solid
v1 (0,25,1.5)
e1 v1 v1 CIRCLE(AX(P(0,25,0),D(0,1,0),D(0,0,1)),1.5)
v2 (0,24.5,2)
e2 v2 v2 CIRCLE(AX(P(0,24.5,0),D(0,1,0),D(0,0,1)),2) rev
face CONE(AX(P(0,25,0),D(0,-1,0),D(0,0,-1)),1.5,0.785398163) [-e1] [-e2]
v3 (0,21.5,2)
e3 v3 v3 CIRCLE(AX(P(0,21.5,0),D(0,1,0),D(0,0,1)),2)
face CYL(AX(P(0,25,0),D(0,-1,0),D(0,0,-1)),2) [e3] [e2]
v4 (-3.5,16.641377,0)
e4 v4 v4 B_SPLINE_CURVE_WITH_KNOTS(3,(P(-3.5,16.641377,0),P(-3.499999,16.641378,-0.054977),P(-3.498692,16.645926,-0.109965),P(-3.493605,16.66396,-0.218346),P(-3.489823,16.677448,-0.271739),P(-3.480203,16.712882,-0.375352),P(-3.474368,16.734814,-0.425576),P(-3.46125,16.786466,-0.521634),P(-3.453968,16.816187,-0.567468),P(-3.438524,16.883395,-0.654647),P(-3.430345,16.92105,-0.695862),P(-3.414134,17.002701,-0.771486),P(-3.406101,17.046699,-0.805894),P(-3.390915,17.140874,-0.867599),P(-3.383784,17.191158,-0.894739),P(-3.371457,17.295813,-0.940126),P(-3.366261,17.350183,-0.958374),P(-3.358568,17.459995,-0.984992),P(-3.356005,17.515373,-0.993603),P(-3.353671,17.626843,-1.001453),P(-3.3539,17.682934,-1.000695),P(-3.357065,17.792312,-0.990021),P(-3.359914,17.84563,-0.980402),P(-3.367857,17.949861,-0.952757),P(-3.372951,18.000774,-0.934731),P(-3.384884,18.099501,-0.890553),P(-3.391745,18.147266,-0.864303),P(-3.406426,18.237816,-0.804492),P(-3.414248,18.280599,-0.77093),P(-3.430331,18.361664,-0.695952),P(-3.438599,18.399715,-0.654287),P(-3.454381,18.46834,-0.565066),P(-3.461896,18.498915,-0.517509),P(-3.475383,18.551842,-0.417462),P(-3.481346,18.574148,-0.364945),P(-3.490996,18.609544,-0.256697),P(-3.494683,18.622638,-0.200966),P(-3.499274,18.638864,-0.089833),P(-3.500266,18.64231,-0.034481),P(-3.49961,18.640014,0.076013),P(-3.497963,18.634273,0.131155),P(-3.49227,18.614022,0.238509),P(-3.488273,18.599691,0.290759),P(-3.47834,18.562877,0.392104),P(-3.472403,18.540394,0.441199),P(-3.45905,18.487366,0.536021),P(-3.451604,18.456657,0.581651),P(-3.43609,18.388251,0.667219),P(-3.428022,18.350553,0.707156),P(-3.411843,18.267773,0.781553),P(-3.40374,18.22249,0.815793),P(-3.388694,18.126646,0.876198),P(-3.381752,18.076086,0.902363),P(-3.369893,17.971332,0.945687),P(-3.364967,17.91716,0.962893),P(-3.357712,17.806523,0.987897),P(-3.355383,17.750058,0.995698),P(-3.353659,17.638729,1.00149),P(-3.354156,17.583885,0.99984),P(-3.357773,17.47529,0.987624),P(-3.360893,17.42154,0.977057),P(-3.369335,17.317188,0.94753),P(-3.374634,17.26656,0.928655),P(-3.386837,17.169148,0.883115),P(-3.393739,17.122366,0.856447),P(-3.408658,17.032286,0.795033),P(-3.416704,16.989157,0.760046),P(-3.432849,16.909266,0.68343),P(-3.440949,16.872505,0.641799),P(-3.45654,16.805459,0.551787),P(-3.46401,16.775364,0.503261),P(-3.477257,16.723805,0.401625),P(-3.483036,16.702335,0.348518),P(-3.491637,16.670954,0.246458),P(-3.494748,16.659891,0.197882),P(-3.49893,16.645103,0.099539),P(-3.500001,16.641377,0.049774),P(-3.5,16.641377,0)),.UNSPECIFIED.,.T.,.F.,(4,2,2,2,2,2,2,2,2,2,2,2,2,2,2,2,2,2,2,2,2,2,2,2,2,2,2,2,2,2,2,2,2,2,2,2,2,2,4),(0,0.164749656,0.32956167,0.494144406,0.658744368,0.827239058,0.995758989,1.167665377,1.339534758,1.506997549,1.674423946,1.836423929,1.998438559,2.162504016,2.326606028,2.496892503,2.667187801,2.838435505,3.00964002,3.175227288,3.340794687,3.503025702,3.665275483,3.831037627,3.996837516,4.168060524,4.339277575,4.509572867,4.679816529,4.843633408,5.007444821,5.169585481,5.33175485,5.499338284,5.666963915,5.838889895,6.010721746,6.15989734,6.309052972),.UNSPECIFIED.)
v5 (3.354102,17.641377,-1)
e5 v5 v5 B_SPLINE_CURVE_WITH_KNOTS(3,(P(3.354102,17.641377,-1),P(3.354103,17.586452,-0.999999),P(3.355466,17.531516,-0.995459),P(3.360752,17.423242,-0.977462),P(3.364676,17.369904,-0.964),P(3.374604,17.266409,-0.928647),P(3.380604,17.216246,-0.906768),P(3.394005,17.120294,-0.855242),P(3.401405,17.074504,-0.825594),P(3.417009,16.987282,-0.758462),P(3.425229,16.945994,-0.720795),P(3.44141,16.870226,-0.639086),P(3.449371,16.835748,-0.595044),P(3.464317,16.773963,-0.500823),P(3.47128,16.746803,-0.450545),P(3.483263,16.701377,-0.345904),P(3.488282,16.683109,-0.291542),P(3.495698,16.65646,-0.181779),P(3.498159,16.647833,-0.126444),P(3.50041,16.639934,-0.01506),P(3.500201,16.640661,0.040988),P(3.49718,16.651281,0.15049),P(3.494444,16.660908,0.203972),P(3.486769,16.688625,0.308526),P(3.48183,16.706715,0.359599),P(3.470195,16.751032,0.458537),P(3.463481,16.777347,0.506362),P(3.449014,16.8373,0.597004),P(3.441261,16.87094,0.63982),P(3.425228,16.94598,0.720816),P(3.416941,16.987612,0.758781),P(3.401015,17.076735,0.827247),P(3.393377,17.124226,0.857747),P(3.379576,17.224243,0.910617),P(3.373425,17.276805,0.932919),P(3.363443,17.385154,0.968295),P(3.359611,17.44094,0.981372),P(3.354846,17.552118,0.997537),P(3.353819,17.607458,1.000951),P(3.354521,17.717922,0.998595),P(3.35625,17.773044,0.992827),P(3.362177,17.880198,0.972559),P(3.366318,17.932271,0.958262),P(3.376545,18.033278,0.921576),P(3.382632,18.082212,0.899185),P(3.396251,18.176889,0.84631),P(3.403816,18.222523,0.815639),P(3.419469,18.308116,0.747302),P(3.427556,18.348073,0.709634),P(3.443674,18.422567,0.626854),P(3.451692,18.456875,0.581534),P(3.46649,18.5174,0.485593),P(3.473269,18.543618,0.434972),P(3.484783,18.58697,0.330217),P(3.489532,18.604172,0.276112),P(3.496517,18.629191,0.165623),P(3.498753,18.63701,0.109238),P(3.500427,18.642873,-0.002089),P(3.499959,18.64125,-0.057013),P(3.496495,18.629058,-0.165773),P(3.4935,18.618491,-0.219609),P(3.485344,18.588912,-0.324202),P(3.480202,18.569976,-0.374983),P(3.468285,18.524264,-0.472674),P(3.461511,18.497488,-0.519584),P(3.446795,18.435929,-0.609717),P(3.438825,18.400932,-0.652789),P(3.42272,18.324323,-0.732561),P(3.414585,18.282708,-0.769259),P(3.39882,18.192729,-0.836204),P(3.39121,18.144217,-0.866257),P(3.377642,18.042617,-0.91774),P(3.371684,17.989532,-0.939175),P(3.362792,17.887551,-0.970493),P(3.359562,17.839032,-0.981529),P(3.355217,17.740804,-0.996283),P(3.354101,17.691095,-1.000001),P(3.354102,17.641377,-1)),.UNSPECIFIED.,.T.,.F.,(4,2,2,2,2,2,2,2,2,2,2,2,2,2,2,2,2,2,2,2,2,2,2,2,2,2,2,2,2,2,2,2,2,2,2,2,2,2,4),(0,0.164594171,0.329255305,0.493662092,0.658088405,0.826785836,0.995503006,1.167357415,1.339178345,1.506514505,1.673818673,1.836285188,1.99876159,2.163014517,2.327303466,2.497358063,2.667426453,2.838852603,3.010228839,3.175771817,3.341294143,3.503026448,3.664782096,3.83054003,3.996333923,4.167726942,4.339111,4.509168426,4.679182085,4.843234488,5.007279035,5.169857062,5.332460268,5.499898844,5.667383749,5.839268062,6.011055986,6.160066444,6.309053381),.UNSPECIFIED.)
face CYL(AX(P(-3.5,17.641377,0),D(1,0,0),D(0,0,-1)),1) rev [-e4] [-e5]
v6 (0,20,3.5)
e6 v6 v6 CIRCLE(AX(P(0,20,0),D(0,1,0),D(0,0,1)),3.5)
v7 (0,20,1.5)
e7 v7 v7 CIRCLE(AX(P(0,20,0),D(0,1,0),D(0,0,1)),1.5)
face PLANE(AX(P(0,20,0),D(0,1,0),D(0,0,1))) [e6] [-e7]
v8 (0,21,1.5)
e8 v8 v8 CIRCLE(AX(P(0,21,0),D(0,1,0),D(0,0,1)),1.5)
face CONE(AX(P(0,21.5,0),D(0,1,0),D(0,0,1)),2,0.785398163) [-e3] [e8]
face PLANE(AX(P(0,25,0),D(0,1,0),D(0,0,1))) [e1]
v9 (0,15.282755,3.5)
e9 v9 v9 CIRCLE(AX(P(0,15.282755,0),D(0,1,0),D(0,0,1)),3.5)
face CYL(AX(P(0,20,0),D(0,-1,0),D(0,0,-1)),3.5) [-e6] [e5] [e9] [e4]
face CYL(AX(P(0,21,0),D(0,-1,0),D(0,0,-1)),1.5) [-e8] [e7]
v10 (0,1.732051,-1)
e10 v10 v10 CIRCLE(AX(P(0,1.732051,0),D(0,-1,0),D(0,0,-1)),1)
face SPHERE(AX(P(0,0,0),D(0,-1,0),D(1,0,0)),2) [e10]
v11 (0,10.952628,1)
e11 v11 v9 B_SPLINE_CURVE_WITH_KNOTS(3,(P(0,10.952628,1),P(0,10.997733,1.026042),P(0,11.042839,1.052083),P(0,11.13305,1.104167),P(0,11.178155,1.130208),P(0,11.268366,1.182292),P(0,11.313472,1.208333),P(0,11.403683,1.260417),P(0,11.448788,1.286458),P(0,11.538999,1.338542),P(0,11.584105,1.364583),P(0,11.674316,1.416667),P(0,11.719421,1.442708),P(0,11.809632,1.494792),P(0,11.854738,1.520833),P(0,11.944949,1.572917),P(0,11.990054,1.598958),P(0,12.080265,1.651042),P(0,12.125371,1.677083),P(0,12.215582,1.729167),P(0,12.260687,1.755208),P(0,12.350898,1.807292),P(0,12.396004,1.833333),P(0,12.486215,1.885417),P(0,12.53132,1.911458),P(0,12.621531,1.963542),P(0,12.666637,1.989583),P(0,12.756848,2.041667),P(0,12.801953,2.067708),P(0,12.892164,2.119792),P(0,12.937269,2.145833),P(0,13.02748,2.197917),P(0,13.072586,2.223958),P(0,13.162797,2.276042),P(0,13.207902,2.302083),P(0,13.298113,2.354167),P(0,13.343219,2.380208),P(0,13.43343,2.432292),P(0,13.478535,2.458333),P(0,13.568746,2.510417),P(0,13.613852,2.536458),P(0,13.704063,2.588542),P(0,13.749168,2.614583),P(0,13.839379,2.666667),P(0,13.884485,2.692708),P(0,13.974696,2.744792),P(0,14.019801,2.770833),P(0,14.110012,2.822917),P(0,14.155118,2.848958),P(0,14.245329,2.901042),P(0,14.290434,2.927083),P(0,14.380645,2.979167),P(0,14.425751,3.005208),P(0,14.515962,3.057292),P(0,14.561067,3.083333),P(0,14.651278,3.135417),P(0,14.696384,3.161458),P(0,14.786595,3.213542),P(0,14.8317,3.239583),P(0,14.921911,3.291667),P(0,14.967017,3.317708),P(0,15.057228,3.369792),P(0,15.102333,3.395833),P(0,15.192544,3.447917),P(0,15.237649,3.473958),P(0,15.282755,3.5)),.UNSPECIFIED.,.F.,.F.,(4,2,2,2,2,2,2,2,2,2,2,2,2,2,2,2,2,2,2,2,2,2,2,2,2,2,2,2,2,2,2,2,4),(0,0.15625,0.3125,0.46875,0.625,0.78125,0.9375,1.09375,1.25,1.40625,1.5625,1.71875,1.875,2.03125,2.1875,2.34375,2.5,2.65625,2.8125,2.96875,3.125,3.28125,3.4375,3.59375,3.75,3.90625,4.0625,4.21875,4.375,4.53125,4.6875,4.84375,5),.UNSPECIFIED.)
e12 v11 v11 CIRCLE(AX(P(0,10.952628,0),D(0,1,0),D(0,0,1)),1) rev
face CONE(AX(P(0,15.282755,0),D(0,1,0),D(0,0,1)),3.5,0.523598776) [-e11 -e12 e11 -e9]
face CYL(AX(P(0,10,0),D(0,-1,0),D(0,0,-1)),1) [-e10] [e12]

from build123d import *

# Parameters (mm, degrees)
SKETCH2_R               = 1
BOSS_EXTRUDE2_DEPTH     = 10
SKETCH4_R               = 3.5
BOSS_EXTRUDE3_DEPTH     = 10
CHAMFER1_SIZE           = 5.282754963
CHAMFER1_SIZE_2         = 3.05
CUT_EXTRUDE4_DEPTH      = 21.603397778
CUT_EXTRUDE4_DEPTH_BACK = 21.603397778
SKETCH5_R               = 1
SKETCH6_R               = 1.5
BOSS_EXTRUDE4_DEPTH     = 1
SKETCH7_R               = 2
BOSS_EXTRUDE5_DEPTH     = 4
CHAMFER2_SIZE           = 0.5


# Some blends are built 0.0001 mm under size
with BuildPart() as part:
    # Sketch1 → Revolve1 (revolve)
    with BuildSketch(Plane.XY):
        with BuildLine():
            Line((0, 0), (0, -2))
            ThreePointArc((0, -2), (2, 0), (0, 2))
            Line((0, 2), (0, 0))
        make_face()
    revolve(axis=Axis((0, 0, 0), (0, 1, 0)))

    # Sketch2 → Boss-Extrude2 (add)
    with BuildSketch(Plane(origin=(0, 0, 0), x_dir=(1, 0, 0), z_dir=(0, 1, 0))):
        with Locations(Location((0, 0, 0), (0, 0, 90))):
            Circle(SKETCH2_R)
    extrude(amount=BOSS_EXTRUDE2_DEPTH)

    # Sketch4 → Boss-Extrude3 (add)
    with BuildSketch(Plane(origin=(0, 10, 0), x_dir=(1, 0, 0), z_dir=(0, 1, 0))):
        with Locations(Location((0, 0, 0), (0, 0, 270))):
            Circle(SKETCH4_R)
    extrude(amount=BOSS_EXTRUDE3_DEPTH)

    # Chamfer1
    # the kernel refuses this chamfer: 5.282754963, 3.05 mm, written as the material it takes off along each edge
    with BuildSketch(Plane(origin=(0, 10, 0), x_dir=(0, 0, 1), z_dir=(-1, 0, 0))) as chamfer1_piece_1_section:
        Polygon((3.5, CHAMFER1_SIZE), (3.5 - CHAMFER1_SIZE_2, 0), (3.5, 0), align=None)
    chamfer1_piece_1 = revolve(axis=Axis((0, 10, 0), (0, 1, 0)), mode=Mode.PRIVATE)
    chamfer1_piece_1 = chamfer1_piece_1 - Plane(origin=(0, 13.183046822, 0), x_dir=(0, 0, -1), z_dir=(0, -1, 0)) * Cylinder(1, 22, mode=Mode.PRIVATE)
    add(chamfer1_piece_1, mode=Mode.SUBTRACT)

    # Sketch5 → Cut-Extrude4 (cut, two sides: drawn at the far end of the back side and taken through both)
    with BuildSketch(Plane(origin=(0, 0, 0), x_dir=(0, 0, -1), z_dir=(1, 0, 0)).offset(-CUT_EXTRUDE4_DEPTH_BACK)):
        with Locations((0, 17.641377482)):
            Circle(SKETCH5_R)
    extrude(amount=CUT_EXTRUDE4_DEPTH + CUT_EXTRUDE4_DEPTH_BACK, mode=Mode.SUBTRACT)

    # Sketch6 → Boss-Extrude4 (add)
    with BuildSketch(Plane(origin=(0, 20, 0), x_dir=(1, 0, 0), z_dir=(0, 1, 0))):
        with Locations(Location((0, 0, 0), (0, 0, 270))):
            Circle(SKETCH6_R)
    extrude(amount=BOSS_EXTRUDE4_DEPTH)

    # Sketch7 → Boss-Extrude5 (add)
    with BuildSketch(Plane(origin=(0, 21, 0), x_dir=(1, 0, 0), z_dir=(0, 1, 0))):
        with Locations(Location((0, 0, 0), (0, 0, 270))):
            Circle(SKETCH7_R)
    extrude(amount=BOSS_EXTRUDE5_DEPTH)

    # Chamfer2
    chamfer2_edges = [part.edges().sort_by_distance(p)[0] for p in [
        (0, 21, -2),
        (0, 25, -2),
    ]]
    chamfer(chamfer2_edges, length=CHAMFER2_SIZE - 0.0001)  # a hair under: the kernel refuses the full size


solid = part.part
